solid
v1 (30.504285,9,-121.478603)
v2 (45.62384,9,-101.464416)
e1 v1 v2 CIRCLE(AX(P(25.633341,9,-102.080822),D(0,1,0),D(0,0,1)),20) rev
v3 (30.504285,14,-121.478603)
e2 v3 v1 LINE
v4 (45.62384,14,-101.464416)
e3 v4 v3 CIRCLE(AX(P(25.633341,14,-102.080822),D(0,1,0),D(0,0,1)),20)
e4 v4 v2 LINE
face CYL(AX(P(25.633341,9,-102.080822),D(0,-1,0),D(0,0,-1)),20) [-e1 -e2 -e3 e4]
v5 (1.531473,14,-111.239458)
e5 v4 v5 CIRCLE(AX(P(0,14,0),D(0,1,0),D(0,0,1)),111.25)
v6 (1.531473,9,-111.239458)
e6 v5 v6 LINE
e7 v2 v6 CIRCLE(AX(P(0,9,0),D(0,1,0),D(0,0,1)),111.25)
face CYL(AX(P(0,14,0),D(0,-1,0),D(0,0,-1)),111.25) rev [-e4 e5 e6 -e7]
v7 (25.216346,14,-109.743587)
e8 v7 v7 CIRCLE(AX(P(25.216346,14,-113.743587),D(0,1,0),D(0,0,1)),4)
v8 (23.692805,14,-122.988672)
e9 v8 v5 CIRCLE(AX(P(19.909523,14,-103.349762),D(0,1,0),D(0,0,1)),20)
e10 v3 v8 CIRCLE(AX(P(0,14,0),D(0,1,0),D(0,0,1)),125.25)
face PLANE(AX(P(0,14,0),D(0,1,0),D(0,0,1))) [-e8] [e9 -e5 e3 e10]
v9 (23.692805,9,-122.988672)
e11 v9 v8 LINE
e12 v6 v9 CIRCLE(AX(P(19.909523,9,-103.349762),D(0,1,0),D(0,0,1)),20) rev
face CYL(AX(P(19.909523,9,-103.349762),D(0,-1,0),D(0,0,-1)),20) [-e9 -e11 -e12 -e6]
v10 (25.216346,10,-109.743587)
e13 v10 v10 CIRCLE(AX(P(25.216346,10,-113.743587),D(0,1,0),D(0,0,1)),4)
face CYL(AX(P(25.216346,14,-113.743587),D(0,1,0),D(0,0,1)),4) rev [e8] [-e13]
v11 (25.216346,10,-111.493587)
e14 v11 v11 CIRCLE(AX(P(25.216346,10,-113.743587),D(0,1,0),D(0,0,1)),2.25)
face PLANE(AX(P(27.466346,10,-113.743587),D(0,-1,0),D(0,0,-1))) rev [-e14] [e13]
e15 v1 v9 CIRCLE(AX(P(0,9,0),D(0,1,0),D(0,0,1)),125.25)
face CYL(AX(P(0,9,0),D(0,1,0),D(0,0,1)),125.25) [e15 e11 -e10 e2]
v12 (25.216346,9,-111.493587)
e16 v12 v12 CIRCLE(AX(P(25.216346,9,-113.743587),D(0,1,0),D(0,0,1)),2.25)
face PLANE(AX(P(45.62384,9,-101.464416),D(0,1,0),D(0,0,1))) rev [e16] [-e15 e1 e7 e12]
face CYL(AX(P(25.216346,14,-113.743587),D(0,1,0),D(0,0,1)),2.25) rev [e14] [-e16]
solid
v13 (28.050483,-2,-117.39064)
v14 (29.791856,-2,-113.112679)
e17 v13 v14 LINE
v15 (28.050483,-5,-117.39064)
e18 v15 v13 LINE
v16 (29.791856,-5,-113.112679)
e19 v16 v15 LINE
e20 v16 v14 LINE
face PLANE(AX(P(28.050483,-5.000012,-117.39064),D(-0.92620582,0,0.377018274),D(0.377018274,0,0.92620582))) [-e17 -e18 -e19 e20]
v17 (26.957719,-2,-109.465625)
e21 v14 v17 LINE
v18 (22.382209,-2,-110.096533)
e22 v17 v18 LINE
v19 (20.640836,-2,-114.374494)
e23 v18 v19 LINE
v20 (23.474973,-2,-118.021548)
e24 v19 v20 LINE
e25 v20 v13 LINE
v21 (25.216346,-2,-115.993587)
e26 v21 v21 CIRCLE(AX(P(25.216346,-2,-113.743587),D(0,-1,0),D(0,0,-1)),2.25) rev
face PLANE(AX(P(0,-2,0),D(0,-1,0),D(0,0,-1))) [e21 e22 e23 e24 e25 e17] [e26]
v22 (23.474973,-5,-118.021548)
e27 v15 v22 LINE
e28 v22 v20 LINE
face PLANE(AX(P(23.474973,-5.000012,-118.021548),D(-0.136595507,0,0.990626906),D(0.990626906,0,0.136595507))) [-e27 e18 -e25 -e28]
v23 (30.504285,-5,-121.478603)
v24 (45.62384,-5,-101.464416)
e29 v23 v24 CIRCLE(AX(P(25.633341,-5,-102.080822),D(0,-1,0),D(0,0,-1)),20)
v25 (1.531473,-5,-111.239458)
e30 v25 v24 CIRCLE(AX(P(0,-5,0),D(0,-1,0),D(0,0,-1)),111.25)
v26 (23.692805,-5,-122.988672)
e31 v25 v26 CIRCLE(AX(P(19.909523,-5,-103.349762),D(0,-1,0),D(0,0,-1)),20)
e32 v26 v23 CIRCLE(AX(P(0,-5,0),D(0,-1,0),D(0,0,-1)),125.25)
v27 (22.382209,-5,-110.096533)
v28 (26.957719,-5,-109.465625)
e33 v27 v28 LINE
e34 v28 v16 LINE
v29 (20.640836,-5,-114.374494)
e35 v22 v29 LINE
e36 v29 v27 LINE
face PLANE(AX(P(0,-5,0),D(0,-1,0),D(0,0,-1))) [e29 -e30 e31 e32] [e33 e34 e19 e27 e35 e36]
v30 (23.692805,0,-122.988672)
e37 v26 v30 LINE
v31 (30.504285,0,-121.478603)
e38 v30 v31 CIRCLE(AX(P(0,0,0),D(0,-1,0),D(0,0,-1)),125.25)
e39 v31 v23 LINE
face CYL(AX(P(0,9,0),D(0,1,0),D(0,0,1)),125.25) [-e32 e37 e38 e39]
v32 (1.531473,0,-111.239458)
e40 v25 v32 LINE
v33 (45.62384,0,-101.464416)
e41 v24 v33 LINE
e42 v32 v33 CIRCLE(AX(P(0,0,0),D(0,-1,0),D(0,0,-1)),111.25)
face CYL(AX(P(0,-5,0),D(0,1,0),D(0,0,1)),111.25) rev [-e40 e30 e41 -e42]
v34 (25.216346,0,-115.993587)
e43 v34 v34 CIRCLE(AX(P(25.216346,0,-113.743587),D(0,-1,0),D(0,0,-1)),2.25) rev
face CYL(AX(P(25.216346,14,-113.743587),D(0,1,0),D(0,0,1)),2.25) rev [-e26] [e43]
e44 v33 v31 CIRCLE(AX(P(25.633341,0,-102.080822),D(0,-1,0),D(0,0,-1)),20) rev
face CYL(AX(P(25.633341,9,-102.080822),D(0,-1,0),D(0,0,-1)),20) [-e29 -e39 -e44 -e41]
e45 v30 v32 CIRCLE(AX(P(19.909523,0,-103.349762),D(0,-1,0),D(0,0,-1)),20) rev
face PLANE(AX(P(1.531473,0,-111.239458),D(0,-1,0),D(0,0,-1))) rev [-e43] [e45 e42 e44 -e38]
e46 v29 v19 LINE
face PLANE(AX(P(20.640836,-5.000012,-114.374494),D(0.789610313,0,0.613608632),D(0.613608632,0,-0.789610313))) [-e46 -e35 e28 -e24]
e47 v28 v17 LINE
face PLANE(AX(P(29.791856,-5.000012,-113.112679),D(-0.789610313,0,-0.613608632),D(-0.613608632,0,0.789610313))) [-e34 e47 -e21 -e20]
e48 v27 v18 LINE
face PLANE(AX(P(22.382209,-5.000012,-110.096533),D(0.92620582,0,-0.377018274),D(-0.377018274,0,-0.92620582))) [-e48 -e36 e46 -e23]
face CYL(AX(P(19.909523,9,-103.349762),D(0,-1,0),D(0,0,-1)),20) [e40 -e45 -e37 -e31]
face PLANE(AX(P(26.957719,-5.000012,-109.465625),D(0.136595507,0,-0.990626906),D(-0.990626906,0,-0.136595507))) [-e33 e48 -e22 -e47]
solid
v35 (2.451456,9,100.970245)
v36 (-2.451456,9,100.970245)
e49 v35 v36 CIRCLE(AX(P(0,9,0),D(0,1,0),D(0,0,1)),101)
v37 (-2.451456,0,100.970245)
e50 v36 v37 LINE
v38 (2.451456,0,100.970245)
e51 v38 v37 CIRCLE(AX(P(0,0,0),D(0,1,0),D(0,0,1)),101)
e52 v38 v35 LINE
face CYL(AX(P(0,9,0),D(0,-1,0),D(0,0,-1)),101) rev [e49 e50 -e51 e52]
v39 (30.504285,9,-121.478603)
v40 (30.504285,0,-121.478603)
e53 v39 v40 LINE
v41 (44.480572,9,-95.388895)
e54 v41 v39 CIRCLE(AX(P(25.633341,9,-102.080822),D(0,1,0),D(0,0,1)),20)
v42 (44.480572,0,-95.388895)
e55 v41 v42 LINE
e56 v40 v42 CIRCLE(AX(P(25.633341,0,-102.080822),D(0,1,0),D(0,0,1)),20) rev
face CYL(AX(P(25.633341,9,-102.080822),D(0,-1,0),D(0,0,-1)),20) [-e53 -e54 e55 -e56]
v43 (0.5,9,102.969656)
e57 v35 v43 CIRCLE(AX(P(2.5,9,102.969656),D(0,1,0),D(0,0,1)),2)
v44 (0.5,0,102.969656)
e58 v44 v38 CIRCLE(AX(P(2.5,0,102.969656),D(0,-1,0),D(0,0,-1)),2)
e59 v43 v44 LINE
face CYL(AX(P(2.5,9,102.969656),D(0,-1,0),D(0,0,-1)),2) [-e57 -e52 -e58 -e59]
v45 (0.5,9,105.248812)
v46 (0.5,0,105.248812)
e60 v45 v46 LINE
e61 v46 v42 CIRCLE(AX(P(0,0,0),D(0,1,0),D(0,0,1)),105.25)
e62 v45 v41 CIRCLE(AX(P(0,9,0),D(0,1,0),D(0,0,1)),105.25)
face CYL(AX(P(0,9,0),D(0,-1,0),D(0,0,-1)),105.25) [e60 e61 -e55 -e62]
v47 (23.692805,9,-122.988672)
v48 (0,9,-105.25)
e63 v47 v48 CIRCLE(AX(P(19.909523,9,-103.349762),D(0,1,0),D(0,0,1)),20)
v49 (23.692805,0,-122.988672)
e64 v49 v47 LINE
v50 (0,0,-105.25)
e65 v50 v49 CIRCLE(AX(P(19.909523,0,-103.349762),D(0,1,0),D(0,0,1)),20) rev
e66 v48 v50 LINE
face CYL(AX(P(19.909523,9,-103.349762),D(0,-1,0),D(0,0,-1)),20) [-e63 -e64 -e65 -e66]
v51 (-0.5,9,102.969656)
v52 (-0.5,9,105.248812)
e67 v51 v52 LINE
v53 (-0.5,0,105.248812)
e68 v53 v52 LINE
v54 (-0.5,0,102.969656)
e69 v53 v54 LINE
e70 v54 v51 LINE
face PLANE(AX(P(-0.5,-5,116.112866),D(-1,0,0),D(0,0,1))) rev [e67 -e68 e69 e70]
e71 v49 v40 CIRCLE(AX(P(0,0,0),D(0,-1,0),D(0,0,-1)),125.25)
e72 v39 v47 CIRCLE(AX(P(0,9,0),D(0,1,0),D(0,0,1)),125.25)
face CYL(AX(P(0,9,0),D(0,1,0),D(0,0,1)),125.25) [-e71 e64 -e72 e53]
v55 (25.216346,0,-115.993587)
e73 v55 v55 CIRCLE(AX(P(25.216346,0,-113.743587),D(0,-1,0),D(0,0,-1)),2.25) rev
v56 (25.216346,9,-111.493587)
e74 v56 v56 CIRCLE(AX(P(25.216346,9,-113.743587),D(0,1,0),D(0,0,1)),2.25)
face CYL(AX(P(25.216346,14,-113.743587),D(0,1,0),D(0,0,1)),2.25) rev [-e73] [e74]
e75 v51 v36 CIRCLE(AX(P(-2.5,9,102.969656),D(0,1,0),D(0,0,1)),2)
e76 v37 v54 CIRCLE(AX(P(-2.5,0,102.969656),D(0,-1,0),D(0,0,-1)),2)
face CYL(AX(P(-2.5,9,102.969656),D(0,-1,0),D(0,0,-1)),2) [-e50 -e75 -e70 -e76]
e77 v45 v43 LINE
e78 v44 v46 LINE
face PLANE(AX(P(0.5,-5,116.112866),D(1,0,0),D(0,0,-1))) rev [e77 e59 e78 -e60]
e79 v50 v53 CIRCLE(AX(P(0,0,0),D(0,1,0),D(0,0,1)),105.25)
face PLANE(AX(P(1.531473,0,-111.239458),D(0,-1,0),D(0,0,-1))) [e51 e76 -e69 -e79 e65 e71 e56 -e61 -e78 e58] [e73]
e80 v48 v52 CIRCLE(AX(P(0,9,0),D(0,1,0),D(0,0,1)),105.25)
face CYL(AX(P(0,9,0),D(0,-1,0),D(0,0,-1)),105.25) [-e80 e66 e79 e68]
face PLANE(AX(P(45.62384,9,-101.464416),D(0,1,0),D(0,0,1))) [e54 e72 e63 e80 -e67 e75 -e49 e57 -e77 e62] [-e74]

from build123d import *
from build123d.topology import SkipClean

# Parameters (mm, degrees)
SKETCH1_R               = 105.25
SKETCH1_R_2             = 101
BOSS_EXTRUDE1_DEPTH     = 9
SKETCH2_W               = 20
SKETCH2_H               = 9
REVOLVE1_ANGLE          = 25
FILLET1_R               = 20
BOSS_EXTRUDE3_DEPTH     = 5
BOSS_EXTRUDE4_START     = 5
SKETCH7_R               = 2.25
BOSS_EXTRUDE4_DEPTH     = 5
CUT_EXTRUDE1_DEPTH      = 164.259690069
CUT_EXTRUDE1_DEPTH_BACK = 3
CUT_EXTRUDE2_DEPTH      = 163.753575695
CUT_EXTRUDE2_DEPTH_BACK = 163.753575695
SKETCH9_W               = 1
SKETCH9_H               = 21.725732916
FILLET2_R               = 2


# Read off the part's stored shape, not the designer's step: Split1, Split2
with BuildPart() as part:
    # Sketch1 → Boss-Extrude1 (new body)
    with BuildSketch(Plane(origin=(0, 0, 0), x_dir=(1, 0, 0), z_dir=(0, 1, 0))):
        with Locations(Location((0, 0, 0), (0, 0, 270))):
            Circle(SKETCH1_R)
        with Locations(Location((0, 0, 0), (0, 0, 270))):
            Circle(SKETCH1_R_2, mode=Mode.SUBTRACT)
    extrude(amount=BOSS_EXTRUDE1_DEPTH)

    # Sketch2 → Revolve1 (revolve)
    with BuildSketch(Plane(origin=(0, 0, 0), x_dir=(0, 0, -1), z_dir=(1, 0, 0))):
        with Locations((115.25, 4.5)):
            Rectangle(SKETCH2_W, SKETCH2_H)
    revolve(axis=Axis((0, 9, 0), (0, -1, 0)), revolution_arc=REVOLVE1_ANGLE)

    # Fillet1
    # the kernel refuses this fillet: 20 mm, written as the material it takes off along each edge
    with BuildSketch(Plane(origin=(0, -59.501187648, -125.25), x_dir=(0.9954761390042871, 0, 0.09501187648455978), z_dir=(0, 1, 0))) as fillet1_piece_1:
        with BuildLine():
            CenterArc((21.90023753, -19.90952278), FILLET1_R, 84.547996623, 95.452003377)
            Line((1.90023753, -19.90952278), (1.50023753, -19.90952278))
            ThreePointArc((1.50023753, -19.90952278), (0.551928309, -9.992766141), (-0.398190456, -0.038004751))
            Line((-0.398190456, -0.038004751), (-0.038004751, 0.398190456))
            ThreePointArc((-0.038004751, 0.398190456), (11.90023753, 0.96661359), (23.83847981, 0.398190456))
            Line((23.83847981, 0.398190456), (23.800475059, 0))
        make_face()
    extrude(amount=128.002375297, mode=Mode.SUBTRACT)
    with BuildSketch(Plane(origin=(52.932937283, -59.501187648, -113.515050326), x_dir=(-0.4226182617406998, 0, 0.9063077870366498), z_dir=(0, 1, 0))) as fillet1_piece_2:
        with BuildLine():
            CenterArc((21.90023753, -19.90952278), FILLET1_R, 95.452003377, 95.452003377)
            Line((2.261327797, -23.692805019), (1.868549602, -23.768470663))
            ThreePointArc((1.868549602, -23.768470663), (0.168423134, -11.93824228), (-0.4, 0))
            Line((-0.4, 0), (0, 0.4))
            ThreePointArc((0, 0.4), (10, 0.4), (19.961995249, 0.398190456))
            Line((19.961995249, 0.398190456), (20, 0))
        make_face()
    extrude(amount=128.002375297, mode=Mode.SUBTRACT)

    # Sketch3 → Boss-Extrude3 (add)
    with BuildSketch(Plane(origin=(0, 9, 0), x_dir=(1, 0, 0), z_dir=(0, 1, 0))):
        with BuildLine():
            ThreePointArc((45.623840254, 101.464415932), (41.591560528, 114.136329191), (30.504285175, 121.478603408))
            ThreePointArc((30.504285175, 121.478603408), (27.109061646, 122.281074892), (23.692805019, 122.988672203))
            ThreePointArc((23.692805019, 122.988672203), (10.541341863, 121.019996943), (1.531473393, 111.239458329))
            ThreePointArc((1.531473393, 111.239458329), (24.078907051, 108.612930792), (45.623840254, 101.464415932))
        make_face()
    extrude(amount=BOSS_EXTRUDE3_DEPTH)


with BuildPart() as body_2:
    # Split1: the piece on the far side of the plane
    add(part.part)
    split(bisect_by=Plane(origin=(0, 9, 0), x_dir=(1, 0, 0), z_dir=(0, 1, 0)), keep=Keep.BOTTOM)


with BuildPart() as part_1:
    add(part.part)

    # Split1
    split(bisect_by=Plane(origin=(0, 9, 0), x_dir=(1, 0, 0), z_dir=(0, 1, 0)), keep=Keep.TOP)


with BuildPart() as cbore_for_m4_shcs1_tool:
    # Sketch6 → CBORE for M4 SHCS1 (revolve)
    with BuildSketch(Plane(origin=(25.216346049, 14, -113.743586553), x_dir=(0, 0, 1), z_dir=(1, 0, 0))):
        Polygon((0, 0), (0, 14), (2.25, 14), (2.25, 4), (4, 4), (4, 0), align=None)
    revolve(axis=Axis((25.216346049, 20.35, -113.743586553), (0, -1, 0)))


with BuildPart() as part_2:
    add(part_1.part)

    # CBORE for M4 SHCS1: cut by cbore_for_m4_shcs1_tool
    add(cbore_for_m4_shcs1_tool.part, mode=Mode.SUBTRACT)


with BuildPart() as body_2_1:
    add(body_2.part)

    # CBORE for M4 SHCS1: cut by cbore_for_m4_shcs1_tool
    add(cbore_for_m4_shcs1_tool.part, mode=Mode.SUBTRACT)

    # Sketch7 → Boss-Extrude4 (add)
    # profile 1 of 2: a face of its own
    with SkipClean():  # the faces are left unmerged after this step: merging them gives an invalid solid
        with BuildSketch(Plane.XZ.offset(BOSS_EXTRUDE4_START)):
            with BuildLine():
                ThreePointArc((45.623840254, -101.464415932), (24.078907051, -108.612930792), (1.531473393, -111.239458329))
                ThreePointArc((1.531473393, -111.239458329), (10.541341863, -121.019996943), (23.692805019, -122.988672203))
                ThreePointArc((23.692805019, -122.988672203), (27.109061646, -122.281074892), (30.504285175, -121.478603408))
                ThreePointArc((30.504285175, -121.478603408), (41.591560528, -114.136329191), (45.623840254, -101.464415932))
            make_face()
            Polygon((25.443065501, -109.130352154), (29.324883958, -111.633314159), (29.098164506, -116.246548558), (24.989626597, -118.356820953), (21.107808139, -115.853858948), (21.334527591, -111.240624549), align=None, mode=Mode.SUBTRACT)
        # profile 2 of 2: a face of its own
        with BuildSketch(Plane.XZ.offset(BOSS_EXTRUDE4_START)):
            Polygon((24.989626597, -118.356820953), (29.098164506, -116.246548558), (29.324883958, -111.633314159), (25.443065501, -109.130352154), (21.334527591, -111.240624549), (21.107808139, -115.853858948), align=None)
            with Locations(Location((25.216346049, -113.743586553, 0), (0, 0, 90))):
                Circle(SKETCH7_R, mode=Mode.SUBTRACT)
        extrude(amount=-BOSS_EXTRUDE4_DEPTH)

    # Sketch8 → Cut-Extrude1 (cut, two sides: drawn at the far end of the back side and taken through both)
    with SkipClean():  # the faces are left unmerged after this step: merging them gives an invalid solid
        with BuildSketch(Plane.XZ.offset(5).offset(-CUT_EXTRUDE1_DEPTH_BACK)):
            Polygon((29.791855737, -113.112678931), (26.957718864, -109.465625117), (22.382209176, -110.096532739), (20.640836361, -114.374494176), (23.474973233, -118.02154799), (28.050482921, -117.390640367), align=None)
        extrude(amount=CUT_EXTRUDE1_DEPTH + CUT_EXTRUDE1_DEPTH_BACK, mode=Mode.SUBTRACT)


with BuildPart() as body_3:
    # Split2: the piece on the far side of the plane
    add(body_2_1.part)
    split(bisect_by=Plane(origin=(0, 0, 0), x_dir=(1, 0, 0), z_dir=(0, 1, 0)), keep=Keep.BOTTOM)


with BuildPart() as body_2_2:
    add(body_2_1.part)

    # Split2
    split(bisect_by=Plane(origin=(0, 0, 0), x_dir=(1, 0, 0), z_dir=(0, 1, 0)), keep=Keep.TOP)

    # Sketch9 → Cut-Extrude2 (cut, two sides: drawn at the far end of the back side and taken through both)
    with BuildSketch(Plane(origin=(0, 9, 0), x_dir=(1, 0, 0), z_dir=(0, 1, 0)).offset(-CUT_EXTRUDE2_DEPTH_BACK)):
        with Locations((0, -105.25)):
            Rectangle(SKETCH9_W, SKETCH9_H)
    extrude(amount=CUT_EXTRUDE2_DEPTH + CUT_EXTRUDE2_DEPTH_BACK, mode=Mode.SUBTRACT)

    # Fillet2
    fillet2_edges = [body_2_2.edges().sort_by_distance(p)[0] for p in [
        (-0.5, 4.5, 100.998762369),
        (0.5, 4.5, 100.998762369),
    ]]
    fillet(fillet2_edges, radius=FILLET2_R)


solid = Compound([part_2.part, body_3.part, body_2_2.part])
